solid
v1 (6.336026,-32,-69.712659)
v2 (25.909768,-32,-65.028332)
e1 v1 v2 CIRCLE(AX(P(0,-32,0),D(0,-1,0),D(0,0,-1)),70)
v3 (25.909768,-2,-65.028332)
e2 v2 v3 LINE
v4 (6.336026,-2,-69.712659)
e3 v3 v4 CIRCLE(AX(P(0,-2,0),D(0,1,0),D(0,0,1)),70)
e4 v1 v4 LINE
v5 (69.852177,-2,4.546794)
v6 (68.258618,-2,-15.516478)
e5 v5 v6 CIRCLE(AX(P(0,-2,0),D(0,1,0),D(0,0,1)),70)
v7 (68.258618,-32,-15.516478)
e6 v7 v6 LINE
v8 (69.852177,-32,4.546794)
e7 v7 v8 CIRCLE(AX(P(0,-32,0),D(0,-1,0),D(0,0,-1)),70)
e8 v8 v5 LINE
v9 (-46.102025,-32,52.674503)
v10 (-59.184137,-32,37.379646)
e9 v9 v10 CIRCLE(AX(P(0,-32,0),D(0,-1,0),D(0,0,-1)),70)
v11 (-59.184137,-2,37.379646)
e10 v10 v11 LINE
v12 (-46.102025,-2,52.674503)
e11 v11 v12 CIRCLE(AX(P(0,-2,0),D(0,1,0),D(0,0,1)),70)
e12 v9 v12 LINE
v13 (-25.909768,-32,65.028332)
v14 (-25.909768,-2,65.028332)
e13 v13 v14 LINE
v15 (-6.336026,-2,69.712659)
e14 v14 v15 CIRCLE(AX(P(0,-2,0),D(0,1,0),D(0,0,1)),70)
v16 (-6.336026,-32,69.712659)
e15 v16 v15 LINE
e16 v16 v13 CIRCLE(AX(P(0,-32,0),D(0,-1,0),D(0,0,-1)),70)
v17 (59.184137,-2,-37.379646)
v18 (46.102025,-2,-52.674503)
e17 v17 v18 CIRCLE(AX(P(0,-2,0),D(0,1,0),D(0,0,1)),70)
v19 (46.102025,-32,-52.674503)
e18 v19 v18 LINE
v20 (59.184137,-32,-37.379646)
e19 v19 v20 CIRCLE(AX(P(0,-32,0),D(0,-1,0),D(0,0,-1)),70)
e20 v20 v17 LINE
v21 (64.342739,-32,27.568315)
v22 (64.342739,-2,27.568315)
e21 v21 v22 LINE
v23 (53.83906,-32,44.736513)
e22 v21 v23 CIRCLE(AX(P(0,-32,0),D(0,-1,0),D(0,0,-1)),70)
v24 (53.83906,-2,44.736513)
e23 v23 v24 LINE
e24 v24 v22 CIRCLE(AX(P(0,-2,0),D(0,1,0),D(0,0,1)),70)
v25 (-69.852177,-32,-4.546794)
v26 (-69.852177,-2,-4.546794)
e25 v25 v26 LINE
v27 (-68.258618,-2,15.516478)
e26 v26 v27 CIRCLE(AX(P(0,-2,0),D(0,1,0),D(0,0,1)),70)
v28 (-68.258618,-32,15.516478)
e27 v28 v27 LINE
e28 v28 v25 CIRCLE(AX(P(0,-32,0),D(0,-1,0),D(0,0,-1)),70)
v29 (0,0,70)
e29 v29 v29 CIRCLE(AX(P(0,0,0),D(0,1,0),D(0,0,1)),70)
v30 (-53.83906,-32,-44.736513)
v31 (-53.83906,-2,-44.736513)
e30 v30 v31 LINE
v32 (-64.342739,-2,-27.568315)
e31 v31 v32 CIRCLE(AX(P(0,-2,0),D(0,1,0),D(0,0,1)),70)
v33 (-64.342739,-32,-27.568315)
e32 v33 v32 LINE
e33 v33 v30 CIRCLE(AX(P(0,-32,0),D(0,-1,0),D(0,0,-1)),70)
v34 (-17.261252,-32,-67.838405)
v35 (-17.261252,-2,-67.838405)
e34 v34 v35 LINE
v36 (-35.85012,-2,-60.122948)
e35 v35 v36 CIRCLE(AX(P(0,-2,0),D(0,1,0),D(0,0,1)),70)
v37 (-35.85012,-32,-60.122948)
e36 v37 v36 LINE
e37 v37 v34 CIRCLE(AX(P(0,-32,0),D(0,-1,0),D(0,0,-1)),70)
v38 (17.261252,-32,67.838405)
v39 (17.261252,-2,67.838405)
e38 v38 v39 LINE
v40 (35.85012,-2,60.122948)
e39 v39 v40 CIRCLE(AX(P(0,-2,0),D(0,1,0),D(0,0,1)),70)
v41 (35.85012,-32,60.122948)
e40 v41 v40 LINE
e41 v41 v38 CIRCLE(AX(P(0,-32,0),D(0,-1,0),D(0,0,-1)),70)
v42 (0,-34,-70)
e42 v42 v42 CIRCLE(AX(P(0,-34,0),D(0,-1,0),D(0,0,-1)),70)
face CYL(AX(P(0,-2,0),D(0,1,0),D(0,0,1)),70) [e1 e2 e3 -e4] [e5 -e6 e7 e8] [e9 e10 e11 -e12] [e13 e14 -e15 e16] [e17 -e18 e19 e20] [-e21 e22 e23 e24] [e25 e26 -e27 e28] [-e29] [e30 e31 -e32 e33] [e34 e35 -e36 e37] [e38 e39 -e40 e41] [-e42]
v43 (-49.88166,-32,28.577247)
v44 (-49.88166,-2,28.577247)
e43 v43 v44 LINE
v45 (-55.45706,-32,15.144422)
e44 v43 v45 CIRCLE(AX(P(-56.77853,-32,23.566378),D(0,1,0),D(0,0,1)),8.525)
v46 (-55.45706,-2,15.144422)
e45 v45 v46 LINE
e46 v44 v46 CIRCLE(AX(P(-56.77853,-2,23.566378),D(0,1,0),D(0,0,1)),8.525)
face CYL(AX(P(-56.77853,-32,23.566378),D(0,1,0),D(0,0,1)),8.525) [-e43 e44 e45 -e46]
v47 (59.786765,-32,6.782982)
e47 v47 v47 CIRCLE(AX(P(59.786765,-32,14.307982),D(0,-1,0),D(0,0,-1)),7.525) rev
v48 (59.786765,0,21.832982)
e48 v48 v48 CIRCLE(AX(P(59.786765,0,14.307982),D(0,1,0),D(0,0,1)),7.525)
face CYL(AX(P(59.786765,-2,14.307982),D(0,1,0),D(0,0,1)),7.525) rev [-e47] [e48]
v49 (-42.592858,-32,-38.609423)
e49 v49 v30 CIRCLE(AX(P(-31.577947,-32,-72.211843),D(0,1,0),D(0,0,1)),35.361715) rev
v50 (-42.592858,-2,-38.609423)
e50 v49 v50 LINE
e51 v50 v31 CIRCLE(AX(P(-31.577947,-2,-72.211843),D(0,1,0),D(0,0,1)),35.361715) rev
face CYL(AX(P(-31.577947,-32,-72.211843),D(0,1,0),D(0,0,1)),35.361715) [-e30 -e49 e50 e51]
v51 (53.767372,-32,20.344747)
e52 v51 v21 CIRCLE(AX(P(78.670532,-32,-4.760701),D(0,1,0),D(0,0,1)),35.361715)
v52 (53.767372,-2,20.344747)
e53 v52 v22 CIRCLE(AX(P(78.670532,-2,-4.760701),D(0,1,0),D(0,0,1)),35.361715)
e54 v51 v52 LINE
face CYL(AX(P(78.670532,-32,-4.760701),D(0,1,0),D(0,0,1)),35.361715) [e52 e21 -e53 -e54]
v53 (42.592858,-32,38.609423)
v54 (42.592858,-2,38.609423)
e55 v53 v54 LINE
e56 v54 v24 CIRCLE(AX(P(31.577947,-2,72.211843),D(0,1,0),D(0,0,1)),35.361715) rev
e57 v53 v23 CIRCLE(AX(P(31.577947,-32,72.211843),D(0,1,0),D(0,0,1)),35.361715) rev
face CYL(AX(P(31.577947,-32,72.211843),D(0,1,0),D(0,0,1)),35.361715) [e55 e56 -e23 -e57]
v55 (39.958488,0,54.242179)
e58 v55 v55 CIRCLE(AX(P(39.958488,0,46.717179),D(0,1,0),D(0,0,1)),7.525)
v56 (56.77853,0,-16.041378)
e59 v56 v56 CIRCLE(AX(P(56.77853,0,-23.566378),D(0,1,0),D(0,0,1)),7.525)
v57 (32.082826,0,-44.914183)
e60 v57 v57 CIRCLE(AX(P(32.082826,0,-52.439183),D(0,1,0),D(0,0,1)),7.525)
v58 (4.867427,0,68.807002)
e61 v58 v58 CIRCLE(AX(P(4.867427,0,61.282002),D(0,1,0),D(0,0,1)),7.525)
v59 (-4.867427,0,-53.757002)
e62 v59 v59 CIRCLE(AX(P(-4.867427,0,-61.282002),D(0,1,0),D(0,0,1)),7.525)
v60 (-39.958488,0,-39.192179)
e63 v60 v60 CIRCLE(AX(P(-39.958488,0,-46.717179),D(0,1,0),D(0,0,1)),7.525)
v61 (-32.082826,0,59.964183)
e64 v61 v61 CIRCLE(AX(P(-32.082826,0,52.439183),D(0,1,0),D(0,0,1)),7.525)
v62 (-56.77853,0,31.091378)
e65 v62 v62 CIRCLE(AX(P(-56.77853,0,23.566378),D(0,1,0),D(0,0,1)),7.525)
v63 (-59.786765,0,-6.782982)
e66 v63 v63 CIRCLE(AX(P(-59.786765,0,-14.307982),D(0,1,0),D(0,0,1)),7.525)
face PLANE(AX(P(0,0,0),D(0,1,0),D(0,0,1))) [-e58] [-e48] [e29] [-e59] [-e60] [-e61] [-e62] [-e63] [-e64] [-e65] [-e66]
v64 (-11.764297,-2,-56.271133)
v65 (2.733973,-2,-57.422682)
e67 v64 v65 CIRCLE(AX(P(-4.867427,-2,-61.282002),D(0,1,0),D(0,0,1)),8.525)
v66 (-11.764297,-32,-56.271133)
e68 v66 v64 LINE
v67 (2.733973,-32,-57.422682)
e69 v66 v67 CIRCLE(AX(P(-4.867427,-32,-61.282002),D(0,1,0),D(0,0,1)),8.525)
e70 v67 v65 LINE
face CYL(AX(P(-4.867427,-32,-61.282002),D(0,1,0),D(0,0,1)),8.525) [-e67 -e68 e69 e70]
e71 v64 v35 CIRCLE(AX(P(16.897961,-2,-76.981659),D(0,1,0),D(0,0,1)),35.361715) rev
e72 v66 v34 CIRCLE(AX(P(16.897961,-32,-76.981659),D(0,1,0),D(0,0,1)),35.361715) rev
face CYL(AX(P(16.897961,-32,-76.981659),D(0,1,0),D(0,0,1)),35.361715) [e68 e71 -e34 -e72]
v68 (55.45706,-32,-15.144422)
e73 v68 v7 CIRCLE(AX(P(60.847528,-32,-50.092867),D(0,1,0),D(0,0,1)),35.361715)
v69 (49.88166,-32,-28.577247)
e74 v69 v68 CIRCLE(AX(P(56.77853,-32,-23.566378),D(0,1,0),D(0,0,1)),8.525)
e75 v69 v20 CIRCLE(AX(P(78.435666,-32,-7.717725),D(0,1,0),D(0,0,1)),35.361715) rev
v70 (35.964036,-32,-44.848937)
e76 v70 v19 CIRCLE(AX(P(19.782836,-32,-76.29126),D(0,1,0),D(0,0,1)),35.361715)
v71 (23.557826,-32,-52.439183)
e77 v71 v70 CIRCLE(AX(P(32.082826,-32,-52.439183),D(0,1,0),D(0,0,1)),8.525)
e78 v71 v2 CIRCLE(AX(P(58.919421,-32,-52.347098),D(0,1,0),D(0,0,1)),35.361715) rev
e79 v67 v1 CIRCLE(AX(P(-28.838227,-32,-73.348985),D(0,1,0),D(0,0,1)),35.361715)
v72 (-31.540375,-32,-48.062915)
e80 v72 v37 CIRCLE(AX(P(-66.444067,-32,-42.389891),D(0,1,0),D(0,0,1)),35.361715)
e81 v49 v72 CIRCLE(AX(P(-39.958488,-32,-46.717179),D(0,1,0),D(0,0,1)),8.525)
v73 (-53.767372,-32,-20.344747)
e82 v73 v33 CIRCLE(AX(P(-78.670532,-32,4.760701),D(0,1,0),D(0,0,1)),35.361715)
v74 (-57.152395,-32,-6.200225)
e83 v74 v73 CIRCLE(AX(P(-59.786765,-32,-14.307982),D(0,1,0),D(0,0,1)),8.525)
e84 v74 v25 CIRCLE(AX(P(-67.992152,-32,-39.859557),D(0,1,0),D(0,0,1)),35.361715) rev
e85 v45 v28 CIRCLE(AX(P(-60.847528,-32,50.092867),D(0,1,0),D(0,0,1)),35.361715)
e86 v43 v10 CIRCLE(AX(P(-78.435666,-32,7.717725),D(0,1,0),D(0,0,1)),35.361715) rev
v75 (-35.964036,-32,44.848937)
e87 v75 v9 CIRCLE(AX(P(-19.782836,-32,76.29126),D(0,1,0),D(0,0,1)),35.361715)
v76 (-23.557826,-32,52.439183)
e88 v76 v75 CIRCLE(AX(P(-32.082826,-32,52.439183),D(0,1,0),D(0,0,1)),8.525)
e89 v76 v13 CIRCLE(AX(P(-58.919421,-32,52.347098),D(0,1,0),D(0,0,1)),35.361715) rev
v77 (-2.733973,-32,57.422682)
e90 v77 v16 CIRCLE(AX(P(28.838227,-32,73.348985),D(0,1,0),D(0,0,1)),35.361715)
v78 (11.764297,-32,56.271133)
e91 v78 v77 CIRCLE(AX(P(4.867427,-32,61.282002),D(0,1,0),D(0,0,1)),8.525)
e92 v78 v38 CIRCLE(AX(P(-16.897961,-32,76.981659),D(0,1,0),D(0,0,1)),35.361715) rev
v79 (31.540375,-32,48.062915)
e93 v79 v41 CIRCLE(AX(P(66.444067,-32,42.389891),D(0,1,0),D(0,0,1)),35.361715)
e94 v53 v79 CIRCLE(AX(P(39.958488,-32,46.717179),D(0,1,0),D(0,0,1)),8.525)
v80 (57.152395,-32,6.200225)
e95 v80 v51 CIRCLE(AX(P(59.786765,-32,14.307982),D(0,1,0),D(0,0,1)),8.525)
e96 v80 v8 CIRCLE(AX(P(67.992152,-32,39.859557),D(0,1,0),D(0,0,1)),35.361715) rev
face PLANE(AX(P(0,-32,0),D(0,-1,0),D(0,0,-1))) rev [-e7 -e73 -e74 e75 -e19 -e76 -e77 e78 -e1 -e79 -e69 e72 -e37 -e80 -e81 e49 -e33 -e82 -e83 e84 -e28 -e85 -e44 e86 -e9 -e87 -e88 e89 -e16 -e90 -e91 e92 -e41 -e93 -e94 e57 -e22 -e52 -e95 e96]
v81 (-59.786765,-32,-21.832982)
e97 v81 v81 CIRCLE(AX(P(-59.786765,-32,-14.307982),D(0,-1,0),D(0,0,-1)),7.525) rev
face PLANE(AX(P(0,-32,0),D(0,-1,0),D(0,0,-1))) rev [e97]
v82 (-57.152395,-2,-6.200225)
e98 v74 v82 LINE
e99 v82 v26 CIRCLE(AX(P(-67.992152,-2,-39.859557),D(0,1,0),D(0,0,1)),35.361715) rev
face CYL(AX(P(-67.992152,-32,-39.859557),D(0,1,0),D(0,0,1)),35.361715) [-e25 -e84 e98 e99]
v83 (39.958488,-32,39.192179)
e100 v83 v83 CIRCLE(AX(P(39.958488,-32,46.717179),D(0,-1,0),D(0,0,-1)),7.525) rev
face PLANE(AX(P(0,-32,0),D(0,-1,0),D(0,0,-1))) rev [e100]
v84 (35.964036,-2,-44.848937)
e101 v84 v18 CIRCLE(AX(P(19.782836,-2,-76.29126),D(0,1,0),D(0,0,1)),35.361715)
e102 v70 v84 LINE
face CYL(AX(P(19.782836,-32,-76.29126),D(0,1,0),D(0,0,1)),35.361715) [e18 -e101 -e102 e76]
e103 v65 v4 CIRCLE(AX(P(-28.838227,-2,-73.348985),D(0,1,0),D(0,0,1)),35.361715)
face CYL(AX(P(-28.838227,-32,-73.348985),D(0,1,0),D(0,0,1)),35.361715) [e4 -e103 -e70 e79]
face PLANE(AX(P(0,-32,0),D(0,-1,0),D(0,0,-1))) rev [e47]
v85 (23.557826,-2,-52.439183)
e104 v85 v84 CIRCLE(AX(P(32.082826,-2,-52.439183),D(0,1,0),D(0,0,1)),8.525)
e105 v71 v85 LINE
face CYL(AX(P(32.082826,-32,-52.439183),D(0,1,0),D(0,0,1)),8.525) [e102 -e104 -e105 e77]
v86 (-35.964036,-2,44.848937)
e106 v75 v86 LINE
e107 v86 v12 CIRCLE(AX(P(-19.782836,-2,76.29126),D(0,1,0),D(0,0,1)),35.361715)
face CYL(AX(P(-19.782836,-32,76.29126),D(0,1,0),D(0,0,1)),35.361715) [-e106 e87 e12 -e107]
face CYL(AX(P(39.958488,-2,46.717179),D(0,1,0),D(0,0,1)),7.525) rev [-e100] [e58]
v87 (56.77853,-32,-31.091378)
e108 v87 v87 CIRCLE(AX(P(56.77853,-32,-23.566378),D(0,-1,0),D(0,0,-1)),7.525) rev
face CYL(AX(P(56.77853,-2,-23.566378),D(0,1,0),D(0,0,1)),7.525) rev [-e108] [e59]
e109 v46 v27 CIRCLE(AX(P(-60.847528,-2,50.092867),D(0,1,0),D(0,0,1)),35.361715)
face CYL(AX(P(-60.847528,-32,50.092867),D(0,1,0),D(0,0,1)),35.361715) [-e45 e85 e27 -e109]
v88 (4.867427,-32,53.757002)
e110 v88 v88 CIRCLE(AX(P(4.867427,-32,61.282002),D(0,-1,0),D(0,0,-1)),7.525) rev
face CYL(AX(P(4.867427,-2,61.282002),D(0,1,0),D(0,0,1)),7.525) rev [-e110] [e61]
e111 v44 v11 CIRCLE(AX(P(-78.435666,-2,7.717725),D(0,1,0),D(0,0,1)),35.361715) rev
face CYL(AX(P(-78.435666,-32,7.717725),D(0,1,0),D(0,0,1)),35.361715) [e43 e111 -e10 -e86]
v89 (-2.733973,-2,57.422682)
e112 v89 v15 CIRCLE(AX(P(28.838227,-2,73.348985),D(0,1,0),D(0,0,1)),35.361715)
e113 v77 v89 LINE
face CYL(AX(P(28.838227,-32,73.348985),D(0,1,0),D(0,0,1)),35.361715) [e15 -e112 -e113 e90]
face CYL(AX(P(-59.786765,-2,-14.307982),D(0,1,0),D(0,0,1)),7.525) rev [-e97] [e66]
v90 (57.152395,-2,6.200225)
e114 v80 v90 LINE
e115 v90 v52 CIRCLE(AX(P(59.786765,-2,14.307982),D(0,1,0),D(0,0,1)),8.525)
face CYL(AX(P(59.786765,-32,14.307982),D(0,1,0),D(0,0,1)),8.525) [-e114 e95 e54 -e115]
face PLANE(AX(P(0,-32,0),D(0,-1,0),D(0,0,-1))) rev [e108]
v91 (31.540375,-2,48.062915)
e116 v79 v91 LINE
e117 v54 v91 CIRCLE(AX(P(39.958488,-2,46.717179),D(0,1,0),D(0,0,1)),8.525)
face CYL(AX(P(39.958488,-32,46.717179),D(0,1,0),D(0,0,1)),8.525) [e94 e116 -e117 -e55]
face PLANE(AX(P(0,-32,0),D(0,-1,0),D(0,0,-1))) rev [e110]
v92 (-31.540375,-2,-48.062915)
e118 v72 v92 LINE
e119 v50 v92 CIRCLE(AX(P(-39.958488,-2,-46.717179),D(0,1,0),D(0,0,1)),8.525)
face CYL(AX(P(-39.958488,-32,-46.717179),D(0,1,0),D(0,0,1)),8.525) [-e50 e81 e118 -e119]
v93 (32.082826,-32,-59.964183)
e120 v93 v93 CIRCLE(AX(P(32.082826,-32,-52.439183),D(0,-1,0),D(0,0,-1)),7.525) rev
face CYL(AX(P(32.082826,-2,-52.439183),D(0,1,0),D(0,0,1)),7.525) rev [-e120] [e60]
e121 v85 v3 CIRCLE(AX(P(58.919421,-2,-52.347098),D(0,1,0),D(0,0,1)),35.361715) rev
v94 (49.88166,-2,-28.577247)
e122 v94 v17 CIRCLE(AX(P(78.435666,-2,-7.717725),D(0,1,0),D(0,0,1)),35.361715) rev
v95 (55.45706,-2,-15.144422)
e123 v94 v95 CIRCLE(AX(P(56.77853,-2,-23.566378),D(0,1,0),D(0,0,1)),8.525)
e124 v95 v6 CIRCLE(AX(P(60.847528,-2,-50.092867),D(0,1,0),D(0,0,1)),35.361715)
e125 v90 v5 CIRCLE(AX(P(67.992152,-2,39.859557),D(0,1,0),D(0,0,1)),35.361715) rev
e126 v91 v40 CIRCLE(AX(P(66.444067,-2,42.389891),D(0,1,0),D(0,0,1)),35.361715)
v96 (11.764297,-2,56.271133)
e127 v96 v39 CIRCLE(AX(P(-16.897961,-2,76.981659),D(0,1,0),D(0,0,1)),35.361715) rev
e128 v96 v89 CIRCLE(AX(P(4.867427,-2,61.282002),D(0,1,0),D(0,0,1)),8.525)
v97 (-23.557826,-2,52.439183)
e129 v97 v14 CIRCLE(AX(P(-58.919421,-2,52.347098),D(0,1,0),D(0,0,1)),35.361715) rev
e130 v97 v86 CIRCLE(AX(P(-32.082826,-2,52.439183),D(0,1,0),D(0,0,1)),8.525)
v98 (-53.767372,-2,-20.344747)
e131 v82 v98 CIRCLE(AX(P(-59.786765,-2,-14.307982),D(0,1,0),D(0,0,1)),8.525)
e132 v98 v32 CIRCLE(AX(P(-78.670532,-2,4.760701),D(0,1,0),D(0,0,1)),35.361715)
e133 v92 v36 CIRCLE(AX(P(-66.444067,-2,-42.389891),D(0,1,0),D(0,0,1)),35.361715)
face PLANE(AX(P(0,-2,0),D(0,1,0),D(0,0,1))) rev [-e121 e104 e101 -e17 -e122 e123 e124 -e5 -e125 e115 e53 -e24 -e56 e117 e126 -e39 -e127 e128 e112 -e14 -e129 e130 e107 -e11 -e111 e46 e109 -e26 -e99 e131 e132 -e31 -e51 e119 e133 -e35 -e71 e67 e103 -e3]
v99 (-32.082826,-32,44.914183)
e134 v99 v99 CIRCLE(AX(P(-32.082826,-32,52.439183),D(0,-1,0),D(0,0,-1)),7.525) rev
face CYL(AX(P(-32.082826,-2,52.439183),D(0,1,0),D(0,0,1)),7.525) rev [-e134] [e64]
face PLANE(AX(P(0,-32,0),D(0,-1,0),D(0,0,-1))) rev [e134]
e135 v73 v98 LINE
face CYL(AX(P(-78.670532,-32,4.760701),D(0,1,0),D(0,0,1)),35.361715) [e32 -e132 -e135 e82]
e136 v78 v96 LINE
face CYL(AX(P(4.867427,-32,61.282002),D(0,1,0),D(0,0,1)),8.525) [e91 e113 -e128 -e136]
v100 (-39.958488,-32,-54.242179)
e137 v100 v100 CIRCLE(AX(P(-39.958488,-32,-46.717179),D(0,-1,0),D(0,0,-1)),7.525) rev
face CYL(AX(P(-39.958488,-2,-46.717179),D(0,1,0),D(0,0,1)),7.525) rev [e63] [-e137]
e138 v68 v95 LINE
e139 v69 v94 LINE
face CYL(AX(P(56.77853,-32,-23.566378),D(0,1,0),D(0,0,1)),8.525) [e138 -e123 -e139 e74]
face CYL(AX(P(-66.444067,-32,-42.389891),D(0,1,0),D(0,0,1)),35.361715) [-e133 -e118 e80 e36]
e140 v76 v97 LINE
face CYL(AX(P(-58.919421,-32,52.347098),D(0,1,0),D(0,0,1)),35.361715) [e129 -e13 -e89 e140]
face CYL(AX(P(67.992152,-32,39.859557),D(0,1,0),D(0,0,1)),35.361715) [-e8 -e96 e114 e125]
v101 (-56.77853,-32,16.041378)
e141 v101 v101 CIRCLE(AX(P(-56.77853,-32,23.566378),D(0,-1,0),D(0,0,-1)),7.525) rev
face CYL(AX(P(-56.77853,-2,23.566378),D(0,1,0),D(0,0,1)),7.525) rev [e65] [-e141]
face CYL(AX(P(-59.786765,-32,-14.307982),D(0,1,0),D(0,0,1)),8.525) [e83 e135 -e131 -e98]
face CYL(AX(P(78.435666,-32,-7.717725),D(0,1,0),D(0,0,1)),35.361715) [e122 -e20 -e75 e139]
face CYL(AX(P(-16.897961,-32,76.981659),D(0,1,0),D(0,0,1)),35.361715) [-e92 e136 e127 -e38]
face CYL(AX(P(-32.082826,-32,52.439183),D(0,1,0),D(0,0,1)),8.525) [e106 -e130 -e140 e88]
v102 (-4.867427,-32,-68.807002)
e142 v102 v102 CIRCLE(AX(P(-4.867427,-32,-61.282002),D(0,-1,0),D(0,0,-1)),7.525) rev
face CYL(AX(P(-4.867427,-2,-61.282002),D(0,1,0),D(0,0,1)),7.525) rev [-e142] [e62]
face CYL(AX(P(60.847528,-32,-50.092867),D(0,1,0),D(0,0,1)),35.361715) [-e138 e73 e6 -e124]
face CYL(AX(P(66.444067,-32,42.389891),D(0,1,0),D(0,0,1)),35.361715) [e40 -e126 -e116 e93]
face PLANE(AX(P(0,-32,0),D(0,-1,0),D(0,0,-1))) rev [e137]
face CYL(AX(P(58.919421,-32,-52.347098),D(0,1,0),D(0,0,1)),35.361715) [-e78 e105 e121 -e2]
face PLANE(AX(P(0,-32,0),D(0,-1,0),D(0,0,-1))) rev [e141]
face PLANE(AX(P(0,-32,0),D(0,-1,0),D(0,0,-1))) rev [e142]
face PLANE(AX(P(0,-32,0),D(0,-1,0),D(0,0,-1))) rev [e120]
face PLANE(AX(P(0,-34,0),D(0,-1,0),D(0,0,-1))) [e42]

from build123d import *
from build123d.topology import SkipClean

# Parameters (mm, degrees)
SKETCH1_R           = 70
BOSS_EXTRUDE1_DEPTH = 2
SKETCH2_R           = 7.525
CUT_EXTRUDE1_DEPTH  = 2
SKETCH3_R           = 7.525
BOSS_EXTRUDE3_DEPTH = 32
SKETCH4_R           = 70
BOSS_EXTRUDE4_DEPTH = 2


with BuildPart() as part:
    # Sketch1 → Boss-Extrude1 (new body)
    with BuildSketch(Plane(origin=(0, 0, 0), x_dir=(1, 0, 0), z_dir=(0, 1, 0))):
        Circle(SKETCH1_R)
    extrude(amount=-BOSS_EXTRUDE1_DEPTH)

    # Sketch2 → Cut-Extrude1 (cut)
    with BuildSketch(Plane(origin=(0, 0, 0), x_dir=(1, 0, 0), z_dir=(0, 1, 0))):
        with Locations((-56.77852978, -23.566378191)):
            Circle(SKETCH2_R)
        with Locations((-59.786765058, 14.307982)):
            Circle(SKETCH2_R)
        with Locations((-39.958488161, 46.717179376)):
            Circle(SKETCH2_R)
        with Locations((-4.867426926, 61.28200209)):
            Circle(SKETCH2_R)
        with Locations((32.082825957, 52.439182904)):
            Circle(SKETCH2_R)
        with Locations((56.77852978, 23.566378191)):
            Circle(SKETCH2_R)
        with Locations((59.786765058, -14.307982)):
            Circle(SKETCH2_R)
        with Locations((39.958488161, -46.717179376)):
            Circle(SKETCH2_R)
        with Locations((4.867426926, -61.28200209)):
            Circle(SKETCH2_R)
        with Locations((-32.082825957, -52.439182904)):
            Circle(SKETCH2_R)
    extrude(amount=-CUT_EXTRUDE1_DEPTH, mode=Mode.SUBTRACT)

    # Sketch3 → Boss-Extrude3 (add)
    # profile 1 of 10: a face of its own
    with BuildSketch(Plane(origin=(0, 0, 0), x_dir=(1, 0, 0), z_dir=(0, 1, 0))):
        with BuildLine():
            ThreePointArc((-53.839060138, 44.73651309), (-48.521333413, 41.173599259), (-42.648435641, 38.627691904))
            ThreePointArc((-42.648435641, 38.627691904), (-34.417274471, 40.238709199), (-31.549808841, 48.120652599))
            ThreePointArc((-31.549808841, 48.120652599), (-33.15457894, 54.317206918), (-35.850120348, 60.122947957))
            ThreePointArc((-35.850120348, 60.122947957), (-45.499701851, 53.195649554), (-53.839060138, 44.73651309))
        make_face()
        with Locations((-39.958488161, 46.717179376)):
            Circle(SKETCH3_R, mode=Mode.SUBTRACT)
    # profile 2 of 10: a face of its own
    with BuildSketch(Plane(origin=(0, 0, 0), x_dir=(1, 0, 0), z_dir=(0, 1, 0))):
        with BuildLine():
            ThreePointArc((-53.80894145, 20.385913384), (-58.749470976, 24.455770937), (-64.342738745, 27.568314616))
            ThreePointArc((-64.342738745, 27.568314616), (-68.07765033, 16.292130784), (-69.852177246, 4.546793813))
            ThreePointArc((-69.852177246, 4.546793813), (-63.455817749, 4.790017318), (-57.208096848, 6.182337701))
            ThreePointArc((-57.208096848, 6.182337701), (-51.495879786, 12.323833215), (-53.80894145, 20.385913384))
        make_face()
        with Locations((-59.786765058, 14.307982)):
            Circle(SKETCH3_R, mode=Mode.SUBTRACT)
    # profile 3 of 10: a face of its own
    with BuildSketch(Plane(origin=(0, 0, 0), x_dir=(1, 0, 0), z_dir=(0, 1, 0))):
        with BuildLine():
            ThreePointArc((6.336025522, 69.712658683), (-5.542413742, 69.780238248), (-17.261251979, 67.838404905))
            ThreePointArc((-17.261251979, 67.838404905), (-15.053348893, 61.830265721), (-11.798521586, 56.318580707))
            ThreePointArc((-11.798521586, 56.318580707), (-4.192440109, 52.783765932), (2.760278407, 57.474938083))
            ThreePointArc((2.760278407, 57.474938083), (5.104235368, 63.431316031), (6.336025522, 69.712658683))
        make_face()
        with Locations((-4.867426926, 61.28200209)):
            Circle(SKETCH3_R, mode=Mode.SUBTRACT)
    # profile 4 of 10: a face of its own
    with BuildSketch(Plane(origin=(0, 0, 0), x_dir=(1, 0, 0), z_dir=(0, 1, 0))):
        with BuildLine():
            ThreePointArc((-55.514887324, -15.135551852), (-61.90406192, -14.746938322), (-68.258617871, -15.516477896))
            ThreePointArc((-68.258617871, -15.516477896), (-64.652250258, -26.834428196), (-59.184136835, -37.379646161))
            ThreePointArc((-59.184136835, -37.379646161), (-54.152336488, -33.423188431), (-49.916209492, -28.624459374))
            ThreePointArc((-49.916209492, -28.624459374), (-48.904809302, -20.298328185), (-55.514887324, -15.135551852))
        make_face()
        with Locations((-56.77852978, -23.566378191)):
            Circle(SKETCH3_R, mode=Mode.SUBTRACT)
    # profile 5 of 10: a face of its own
    with BuildSketch(Plane(origin=(0, 0, 0), x_dir=(1, 0, 0), z_dir=(0, 1, 0))):
        with BuildLine():
            ThreePointArc((46.102024996, 52.674503237), (36.531888036, 59.711147674), (25.909767747, 65.028331789))
            ThreePointArc((25.909767747, 65.028331789), (24.16450326, 58.869872212), (23.558026699, 52.497685879))
            ThreePointArc((23.558026699, 52.497685879), (27.633763879, 45.167218133), (36.016033123, 44.87575072))
            ThreePointArc((36.016033123, 44.87575072), (41.413405253, 48.316818371), (46.102024996, 52.674503237))
        make_face()
        with Locations((32.082825957, 52.439182904)):
            Circle(SKETCH3_R, mode=Mode.SUBTRACT)
    # profile 6 of 10: a face of its own
    with BuildSketch(Plane(origin=(0, 0, 0), x_dir=(1, 0, 0), z_dir=(0, 1, 0))):
        with BuildLine():
            ThreePointArc((-36.016033123, -44.87575072), (-41.413405253, -48.316818371), (-46.102024996, -52.674503237))
            ThreePointArc((-46.102024996, -52.674503237), (-36.531888036, -59.711147674), (-25.909767747, -65.028331789))
            ThreePointArc((-25.909767747, -65.028331789), (-24.16450326, -58.869872212), (-23.558026699, -52.497685878))
            ThreePointArc((-23.558026699, -52.497685878), (-27.633763879, -45.167218133), (-36.016033123, -44.87575072))
        make_face()
        with Locations((-32.082825957, -52.439182904)):
            Circle(SKETCH3_R, mode=Mode.SUBTRACT)
    # profile 7 of 10: a face of its own
    with BuildSketch(Plane(origin=(0, 0, 0), x_dir=(1, 0, 0), z_dir=(0, 1, 0))):
        with BuildLine():
            ThreePointArc((68.258617871, 15.516477896), (64.652250258, 26.834428196), (59.184136835, 37.379646161))
            ThreePointArc((59.184136835, 37.379646161), (54.152336489, 33.423188431), (49.916209492, 28.624459375))
            ThreePointArc((49.916209492, 28.624459375), (48.904809302, 20.298328185), (55.514887325, 15.135551852))
            ThreePointArc((55.514887325, 15.135551852), (61.904061921, 14.746938322), (68.258617871, 15.516477896))
        make_face()
        with Locations((56.77852978, 23.566378191)):
            Circle(SKETCH3_R, mode=Mode.SUBTRACT)
    # profile 8 of 10: a face of its own
    with BuildSketch(Plane(origin=(0, 0, 0), x_dir=(1, 0, 0), z_dir=(0, 1, 0))):
        with BuildLine():
            ThreePointArc((-2.760278408, -57.474938084), (-5.104235368, -63.431316031), (-6.336025522, -69.712658683))
            ThreePointArc((-6.336025522, -69.712658683), (5.542413742, -69.780238248), (17.261251979, -67.838404905))
            ThreePointArc((17.261251979, -67.838404905), (15.053348893, -61.830265722), (11.798521586, -56.318580708))
            ThreePointArc((11.798521586, -56.318580708), (4.192440109, -52.783765932), (-2.760278408, -57.474938084))
        make_face()
        with Locations((4.867426926, -61.28200209)):
            Circle(SKETCH3_R, mode=Mode.SUBTRACT)
    # profile 9 of 10: a face of its own
    with BuildSketch(Plane(origin=(0, 0, 0), x_dir=(1, 0, 0), z_dir=(0, 1, 0))):
        with BuildLine():
            ThreePointArc((64.342738745, -27.568314616), (68.07765033, -16.292130784), (69.852177246, -4.546793813))
            ThreePointArc((69.852177246, -4.546793813), (63.455817749, -4.790017318), (57.208096849, -6.182337701))
            ThreePointArc((57.208096849, -6.182337701), (51.495879786, -12.323833215), (53.808941451, -20.385913385))
            ThreePointArc((53.808941451, -20.385913385), (58.749470976, -24.455770937), (64.342738745, -27.568314616))
        make_face()
        with Locations((59.786765058, -14.307982)):
            Circle(SKETCH3_R, mode=Mode.SUBTRACT)
    # profile 10 of 10: a face of its own
    with BuildSketch(Plane(origin=(0, 0, 0), x_dir=(1, 0, 0), z_dir=(0, 1, 0))):
        with BuildLine():
            ThreePointArc((31.549808841, -48.1206526), (33.15457894, -54.317206918), (35.850120348, -60.122947957))
            ThreePointArc((35.850120348, -60.122947957), (45.499701851, -53.195649554), (53.839060138, -44.73651309))
            ThreePointArc((53.839060138, -44.73651309), (48.521333413, -41.173599259), (42.648435641, -38.627691905))
            ThreePointArc((42.648435641, -38.627691905), (34.417274471, -40.238709199), (31.549808841, -48.1206526))
        make_face()
        with Locations((39.958488161, -46.717179376)):
            Circle(SKETCH3_R, mode=Mode.SUBTRACT)
    extrude(amount=-BOSS_EXTRUDE3_DEPTH)

    # Sketch4 → Boss-Extrude4 (add)
    with SkipClean():  # the faces are left unmerged after this step: merging them gives an invalid solid
        with BuildSketch(Plane.XZ.offset(32)):
            Circle(SKETCH4_R)
        extrude(amount=BOSS_EXTRUDE4_DEPTH)


solid = part.part
